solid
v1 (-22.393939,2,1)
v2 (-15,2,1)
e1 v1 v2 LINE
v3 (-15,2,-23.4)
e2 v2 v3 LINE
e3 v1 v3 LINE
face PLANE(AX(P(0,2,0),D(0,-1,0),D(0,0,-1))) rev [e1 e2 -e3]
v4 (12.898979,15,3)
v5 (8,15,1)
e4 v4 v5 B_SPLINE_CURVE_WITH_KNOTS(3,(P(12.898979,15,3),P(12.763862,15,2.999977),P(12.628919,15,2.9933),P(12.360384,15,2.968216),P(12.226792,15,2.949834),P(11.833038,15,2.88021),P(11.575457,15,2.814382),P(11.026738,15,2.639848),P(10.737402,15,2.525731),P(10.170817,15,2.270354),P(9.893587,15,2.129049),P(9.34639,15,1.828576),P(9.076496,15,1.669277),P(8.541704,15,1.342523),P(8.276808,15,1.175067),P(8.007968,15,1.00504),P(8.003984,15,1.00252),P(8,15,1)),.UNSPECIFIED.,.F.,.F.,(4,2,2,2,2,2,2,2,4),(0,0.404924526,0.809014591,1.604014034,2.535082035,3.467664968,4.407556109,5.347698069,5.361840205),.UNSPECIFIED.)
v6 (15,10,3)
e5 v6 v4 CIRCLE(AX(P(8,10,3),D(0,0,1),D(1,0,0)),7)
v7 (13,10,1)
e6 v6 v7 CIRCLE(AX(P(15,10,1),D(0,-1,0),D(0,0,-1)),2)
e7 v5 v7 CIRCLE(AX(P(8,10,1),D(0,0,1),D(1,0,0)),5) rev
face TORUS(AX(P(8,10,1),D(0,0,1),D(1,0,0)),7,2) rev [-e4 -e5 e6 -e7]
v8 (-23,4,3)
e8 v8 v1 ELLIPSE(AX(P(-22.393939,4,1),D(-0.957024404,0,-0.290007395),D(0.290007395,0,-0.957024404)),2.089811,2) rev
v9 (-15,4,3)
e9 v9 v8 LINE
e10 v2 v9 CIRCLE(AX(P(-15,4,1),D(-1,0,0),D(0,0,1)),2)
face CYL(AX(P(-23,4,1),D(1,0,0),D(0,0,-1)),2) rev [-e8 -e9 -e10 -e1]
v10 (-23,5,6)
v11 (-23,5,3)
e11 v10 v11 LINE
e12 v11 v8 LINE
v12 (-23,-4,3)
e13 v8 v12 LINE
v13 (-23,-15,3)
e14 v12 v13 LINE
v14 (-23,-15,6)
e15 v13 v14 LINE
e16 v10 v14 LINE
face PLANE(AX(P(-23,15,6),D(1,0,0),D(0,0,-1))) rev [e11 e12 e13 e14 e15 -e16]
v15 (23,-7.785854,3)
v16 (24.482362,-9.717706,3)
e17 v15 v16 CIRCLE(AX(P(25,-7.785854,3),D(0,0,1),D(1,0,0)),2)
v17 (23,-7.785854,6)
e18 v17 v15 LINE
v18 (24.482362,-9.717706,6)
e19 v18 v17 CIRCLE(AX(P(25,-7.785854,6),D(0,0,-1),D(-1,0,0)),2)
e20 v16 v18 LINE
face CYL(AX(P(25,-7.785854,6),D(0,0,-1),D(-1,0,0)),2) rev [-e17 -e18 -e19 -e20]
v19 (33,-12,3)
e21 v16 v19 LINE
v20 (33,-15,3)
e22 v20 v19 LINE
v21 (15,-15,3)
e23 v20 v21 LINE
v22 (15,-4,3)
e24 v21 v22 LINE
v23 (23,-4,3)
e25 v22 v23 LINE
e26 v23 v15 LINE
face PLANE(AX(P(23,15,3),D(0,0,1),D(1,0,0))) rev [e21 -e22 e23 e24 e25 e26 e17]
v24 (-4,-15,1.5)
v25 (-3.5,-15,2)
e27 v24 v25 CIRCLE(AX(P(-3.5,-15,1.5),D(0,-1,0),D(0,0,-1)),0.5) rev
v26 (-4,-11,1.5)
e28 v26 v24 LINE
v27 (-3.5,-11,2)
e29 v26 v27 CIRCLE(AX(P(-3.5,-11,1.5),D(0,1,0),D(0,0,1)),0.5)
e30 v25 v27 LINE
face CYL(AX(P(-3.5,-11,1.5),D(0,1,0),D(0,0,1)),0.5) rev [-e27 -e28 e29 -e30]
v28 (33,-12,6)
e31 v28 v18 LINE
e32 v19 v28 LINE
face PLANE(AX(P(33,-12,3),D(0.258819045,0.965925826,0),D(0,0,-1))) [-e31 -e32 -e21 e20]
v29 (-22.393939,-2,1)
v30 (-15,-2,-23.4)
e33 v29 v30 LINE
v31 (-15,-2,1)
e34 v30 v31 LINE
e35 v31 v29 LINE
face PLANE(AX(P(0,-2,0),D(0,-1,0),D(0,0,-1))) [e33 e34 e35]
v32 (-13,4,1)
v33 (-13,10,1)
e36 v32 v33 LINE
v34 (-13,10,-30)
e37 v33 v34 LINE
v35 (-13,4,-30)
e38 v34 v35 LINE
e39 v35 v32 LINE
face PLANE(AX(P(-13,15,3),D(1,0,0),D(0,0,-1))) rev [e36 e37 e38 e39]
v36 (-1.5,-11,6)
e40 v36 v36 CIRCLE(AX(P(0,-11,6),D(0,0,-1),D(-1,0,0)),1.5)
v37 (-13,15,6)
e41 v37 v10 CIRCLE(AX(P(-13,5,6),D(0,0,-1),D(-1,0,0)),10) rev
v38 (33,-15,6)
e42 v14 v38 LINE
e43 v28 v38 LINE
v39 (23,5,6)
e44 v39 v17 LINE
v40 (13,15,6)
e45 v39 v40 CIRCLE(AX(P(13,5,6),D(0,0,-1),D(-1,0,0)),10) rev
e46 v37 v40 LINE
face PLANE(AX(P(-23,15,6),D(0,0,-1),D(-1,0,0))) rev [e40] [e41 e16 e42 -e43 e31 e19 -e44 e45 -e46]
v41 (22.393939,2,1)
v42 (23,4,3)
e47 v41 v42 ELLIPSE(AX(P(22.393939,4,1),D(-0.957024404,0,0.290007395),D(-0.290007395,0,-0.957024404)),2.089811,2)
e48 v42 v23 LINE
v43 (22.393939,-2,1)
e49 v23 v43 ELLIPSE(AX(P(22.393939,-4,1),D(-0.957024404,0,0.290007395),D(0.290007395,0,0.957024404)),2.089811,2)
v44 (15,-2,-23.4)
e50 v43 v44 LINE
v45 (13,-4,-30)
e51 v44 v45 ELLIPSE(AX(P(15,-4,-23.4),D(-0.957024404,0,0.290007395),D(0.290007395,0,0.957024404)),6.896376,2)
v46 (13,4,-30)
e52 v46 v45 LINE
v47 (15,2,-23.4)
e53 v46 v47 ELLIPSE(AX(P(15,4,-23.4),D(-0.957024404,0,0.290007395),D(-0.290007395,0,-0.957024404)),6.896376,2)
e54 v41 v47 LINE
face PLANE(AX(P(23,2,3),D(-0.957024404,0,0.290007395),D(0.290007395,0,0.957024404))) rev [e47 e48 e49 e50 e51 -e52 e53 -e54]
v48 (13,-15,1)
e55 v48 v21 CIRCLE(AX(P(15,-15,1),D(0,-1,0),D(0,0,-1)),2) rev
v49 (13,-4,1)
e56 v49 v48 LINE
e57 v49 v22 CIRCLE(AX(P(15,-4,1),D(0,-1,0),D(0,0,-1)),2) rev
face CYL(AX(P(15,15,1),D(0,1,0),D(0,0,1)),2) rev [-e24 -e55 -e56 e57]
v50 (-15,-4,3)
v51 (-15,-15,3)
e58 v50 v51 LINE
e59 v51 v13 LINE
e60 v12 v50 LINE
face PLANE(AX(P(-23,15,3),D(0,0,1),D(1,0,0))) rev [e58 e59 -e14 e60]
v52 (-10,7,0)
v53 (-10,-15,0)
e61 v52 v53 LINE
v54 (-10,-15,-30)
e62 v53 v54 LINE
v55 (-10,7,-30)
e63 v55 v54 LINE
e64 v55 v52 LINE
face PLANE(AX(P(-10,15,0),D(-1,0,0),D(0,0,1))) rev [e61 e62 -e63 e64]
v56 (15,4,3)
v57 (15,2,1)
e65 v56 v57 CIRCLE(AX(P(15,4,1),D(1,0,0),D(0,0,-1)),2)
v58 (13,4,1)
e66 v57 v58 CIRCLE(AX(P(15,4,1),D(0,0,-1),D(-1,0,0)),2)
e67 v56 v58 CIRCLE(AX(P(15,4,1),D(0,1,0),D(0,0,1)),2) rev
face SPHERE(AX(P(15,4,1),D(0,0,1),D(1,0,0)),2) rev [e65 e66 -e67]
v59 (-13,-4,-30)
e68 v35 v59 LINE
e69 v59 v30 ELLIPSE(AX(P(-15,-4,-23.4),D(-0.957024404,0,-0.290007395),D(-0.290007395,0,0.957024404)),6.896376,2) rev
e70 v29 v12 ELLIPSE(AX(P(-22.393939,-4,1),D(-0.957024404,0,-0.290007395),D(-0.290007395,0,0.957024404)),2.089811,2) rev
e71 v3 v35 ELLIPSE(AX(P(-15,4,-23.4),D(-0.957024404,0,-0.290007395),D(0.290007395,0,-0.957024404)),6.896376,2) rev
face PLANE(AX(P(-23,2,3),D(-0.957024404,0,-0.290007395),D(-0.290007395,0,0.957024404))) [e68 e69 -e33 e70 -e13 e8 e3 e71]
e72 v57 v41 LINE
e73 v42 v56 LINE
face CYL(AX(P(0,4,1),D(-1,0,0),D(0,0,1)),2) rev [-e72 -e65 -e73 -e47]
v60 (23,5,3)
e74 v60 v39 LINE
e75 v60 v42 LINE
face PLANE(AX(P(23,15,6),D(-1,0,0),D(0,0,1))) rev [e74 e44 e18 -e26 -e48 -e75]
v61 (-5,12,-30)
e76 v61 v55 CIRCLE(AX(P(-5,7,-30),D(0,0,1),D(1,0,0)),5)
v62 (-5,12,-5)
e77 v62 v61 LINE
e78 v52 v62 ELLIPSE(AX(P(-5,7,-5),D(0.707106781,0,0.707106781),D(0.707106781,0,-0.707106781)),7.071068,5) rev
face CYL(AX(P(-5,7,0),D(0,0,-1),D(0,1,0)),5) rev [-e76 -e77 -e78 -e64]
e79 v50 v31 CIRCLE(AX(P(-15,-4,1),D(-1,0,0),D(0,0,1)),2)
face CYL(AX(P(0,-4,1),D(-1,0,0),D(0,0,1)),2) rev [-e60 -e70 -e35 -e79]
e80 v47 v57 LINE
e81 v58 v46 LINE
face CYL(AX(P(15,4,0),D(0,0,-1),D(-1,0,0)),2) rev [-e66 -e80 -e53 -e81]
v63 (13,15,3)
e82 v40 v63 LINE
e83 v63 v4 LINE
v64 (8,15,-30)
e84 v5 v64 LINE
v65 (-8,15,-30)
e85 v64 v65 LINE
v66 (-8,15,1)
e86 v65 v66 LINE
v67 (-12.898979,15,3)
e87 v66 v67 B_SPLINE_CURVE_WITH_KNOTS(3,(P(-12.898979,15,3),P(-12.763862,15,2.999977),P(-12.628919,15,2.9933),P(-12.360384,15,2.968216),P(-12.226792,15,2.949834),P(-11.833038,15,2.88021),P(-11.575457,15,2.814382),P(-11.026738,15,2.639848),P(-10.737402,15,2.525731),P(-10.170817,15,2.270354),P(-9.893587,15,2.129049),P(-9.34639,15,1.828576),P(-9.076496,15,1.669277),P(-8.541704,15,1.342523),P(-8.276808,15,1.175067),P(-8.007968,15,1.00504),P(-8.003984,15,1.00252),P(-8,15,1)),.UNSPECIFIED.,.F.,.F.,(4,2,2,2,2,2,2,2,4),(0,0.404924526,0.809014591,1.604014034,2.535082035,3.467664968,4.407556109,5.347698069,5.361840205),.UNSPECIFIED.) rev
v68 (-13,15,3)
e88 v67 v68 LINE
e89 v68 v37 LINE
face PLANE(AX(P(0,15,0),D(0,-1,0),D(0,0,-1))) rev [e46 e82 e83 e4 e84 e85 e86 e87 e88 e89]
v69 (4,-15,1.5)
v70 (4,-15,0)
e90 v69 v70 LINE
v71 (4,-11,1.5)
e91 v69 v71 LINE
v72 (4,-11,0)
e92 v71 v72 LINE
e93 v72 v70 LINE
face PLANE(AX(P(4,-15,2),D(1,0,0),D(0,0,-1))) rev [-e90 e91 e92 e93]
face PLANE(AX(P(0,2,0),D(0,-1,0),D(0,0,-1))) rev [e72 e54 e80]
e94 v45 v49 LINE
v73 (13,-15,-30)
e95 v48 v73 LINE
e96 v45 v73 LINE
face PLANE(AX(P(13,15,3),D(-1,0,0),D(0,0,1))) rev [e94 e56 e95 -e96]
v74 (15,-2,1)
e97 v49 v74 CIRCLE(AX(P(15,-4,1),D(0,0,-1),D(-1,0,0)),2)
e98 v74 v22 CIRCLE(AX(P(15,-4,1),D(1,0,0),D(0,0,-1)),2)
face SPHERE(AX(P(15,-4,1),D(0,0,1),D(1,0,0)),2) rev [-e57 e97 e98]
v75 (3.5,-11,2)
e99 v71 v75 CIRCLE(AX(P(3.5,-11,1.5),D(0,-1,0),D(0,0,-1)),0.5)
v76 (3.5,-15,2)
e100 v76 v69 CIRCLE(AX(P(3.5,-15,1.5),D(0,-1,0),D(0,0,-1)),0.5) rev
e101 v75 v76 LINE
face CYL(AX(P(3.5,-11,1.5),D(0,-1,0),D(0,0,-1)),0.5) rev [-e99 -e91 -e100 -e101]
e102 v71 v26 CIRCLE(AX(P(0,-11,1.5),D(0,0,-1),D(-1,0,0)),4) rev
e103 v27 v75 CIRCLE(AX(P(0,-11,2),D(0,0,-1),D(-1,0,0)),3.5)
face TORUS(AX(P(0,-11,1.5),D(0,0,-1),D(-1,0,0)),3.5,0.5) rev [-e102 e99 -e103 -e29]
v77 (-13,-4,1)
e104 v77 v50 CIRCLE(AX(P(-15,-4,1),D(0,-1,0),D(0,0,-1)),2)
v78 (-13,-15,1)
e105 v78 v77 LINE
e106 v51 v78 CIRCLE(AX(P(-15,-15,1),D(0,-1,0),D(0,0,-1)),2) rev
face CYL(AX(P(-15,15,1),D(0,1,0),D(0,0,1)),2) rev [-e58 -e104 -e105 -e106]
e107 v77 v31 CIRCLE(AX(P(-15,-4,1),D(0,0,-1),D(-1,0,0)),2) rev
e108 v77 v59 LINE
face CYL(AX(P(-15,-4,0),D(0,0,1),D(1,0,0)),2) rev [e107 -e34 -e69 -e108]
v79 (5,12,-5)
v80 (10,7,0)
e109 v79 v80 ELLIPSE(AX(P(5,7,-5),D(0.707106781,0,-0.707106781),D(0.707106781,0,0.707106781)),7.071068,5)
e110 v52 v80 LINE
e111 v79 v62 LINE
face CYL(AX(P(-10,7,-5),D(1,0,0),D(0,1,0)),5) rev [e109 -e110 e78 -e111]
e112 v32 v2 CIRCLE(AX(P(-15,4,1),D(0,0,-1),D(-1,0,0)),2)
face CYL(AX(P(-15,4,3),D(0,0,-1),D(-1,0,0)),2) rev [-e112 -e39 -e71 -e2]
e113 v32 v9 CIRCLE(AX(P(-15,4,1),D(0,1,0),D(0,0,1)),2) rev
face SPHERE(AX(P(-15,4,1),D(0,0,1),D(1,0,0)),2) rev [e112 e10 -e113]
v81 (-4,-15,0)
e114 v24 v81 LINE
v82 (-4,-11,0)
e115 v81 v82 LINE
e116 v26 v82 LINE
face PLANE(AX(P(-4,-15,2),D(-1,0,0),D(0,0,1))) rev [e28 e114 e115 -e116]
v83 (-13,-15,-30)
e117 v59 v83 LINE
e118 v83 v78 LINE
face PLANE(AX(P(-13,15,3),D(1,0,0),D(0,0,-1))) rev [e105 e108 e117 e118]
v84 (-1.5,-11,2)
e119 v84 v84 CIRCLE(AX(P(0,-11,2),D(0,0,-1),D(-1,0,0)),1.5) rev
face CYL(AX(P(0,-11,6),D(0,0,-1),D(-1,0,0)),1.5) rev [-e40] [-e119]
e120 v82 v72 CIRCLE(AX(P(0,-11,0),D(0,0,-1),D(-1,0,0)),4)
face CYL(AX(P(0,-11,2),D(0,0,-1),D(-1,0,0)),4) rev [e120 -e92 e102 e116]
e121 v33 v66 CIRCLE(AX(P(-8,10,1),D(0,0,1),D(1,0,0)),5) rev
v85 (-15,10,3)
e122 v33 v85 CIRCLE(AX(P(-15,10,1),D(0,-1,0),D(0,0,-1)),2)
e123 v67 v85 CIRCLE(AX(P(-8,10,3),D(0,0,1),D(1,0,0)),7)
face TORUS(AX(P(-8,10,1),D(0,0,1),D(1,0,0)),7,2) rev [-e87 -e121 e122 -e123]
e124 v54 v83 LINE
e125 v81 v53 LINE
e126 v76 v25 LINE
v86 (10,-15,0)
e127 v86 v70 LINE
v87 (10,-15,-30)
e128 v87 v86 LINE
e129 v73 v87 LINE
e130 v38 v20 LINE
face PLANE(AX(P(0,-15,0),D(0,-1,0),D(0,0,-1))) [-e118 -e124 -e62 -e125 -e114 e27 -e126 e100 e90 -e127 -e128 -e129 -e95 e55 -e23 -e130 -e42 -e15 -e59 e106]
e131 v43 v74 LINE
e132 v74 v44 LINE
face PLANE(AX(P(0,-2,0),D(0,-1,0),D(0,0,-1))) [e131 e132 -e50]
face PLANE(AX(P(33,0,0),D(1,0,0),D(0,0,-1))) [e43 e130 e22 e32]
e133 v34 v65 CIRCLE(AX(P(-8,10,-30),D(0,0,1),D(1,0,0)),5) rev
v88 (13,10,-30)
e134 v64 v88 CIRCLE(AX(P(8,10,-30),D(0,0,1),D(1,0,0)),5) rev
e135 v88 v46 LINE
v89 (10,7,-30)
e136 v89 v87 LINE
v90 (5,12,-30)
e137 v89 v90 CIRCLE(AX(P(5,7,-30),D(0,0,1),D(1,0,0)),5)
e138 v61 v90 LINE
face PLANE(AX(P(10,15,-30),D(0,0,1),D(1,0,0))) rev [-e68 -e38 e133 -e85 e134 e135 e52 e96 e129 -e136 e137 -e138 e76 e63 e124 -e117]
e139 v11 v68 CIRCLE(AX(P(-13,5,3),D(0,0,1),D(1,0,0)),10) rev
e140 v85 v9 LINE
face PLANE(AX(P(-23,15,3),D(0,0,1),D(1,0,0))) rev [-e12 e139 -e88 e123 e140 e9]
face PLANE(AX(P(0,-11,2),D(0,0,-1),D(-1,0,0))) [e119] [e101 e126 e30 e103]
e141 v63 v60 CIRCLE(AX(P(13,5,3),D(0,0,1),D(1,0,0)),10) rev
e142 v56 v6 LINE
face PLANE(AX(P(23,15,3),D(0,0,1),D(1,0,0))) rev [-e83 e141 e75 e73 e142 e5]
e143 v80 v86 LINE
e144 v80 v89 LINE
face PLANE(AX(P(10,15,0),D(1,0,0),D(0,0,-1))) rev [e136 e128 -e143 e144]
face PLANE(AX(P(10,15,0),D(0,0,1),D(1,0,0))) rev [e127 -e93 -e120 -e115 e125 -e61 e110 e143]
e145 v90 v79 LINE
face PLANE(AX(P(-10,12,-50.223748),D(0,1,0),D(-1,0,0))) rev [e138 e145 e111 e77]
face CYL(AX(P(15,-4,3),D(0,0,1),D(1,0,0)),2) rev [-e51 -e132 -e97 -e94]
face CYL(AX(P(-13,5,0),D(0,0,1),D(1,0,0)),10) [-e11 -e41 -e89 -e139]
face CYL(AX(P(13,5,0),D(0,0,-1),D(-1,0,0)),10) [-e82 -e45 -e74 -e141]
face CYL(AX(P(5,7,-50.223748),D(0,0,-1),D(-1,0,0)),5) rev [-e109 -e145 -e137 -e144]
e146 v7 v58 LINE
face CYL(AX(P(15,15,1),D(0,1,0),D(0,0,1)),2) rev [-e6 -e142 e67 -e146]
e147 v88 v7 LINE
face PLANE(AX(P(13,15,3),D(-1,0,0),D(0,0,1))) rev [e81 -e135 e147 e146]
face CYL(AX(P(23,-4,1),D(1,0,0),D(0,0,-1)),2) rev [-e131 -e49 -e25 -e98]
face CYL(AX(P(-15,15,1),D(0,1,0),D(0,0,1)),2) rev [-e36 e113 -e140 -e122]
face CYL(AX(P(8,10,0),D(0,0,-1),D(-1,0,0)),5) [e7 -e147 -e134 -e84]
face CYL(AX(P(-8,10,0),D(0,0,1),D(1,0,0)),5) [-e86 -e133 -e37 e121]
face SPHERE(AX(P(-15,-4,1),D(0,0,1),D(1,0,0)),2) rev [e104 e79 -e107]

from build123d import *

# Parameters (mm, degrees)
BOSS_EXTRUDE1_DEPTH = 15
BOSS_EXTRUDE2_DEPTH = 2
SKETCH3_R           = 1.5
CUT_EXTRUDE1_DEPTH  = 41.669398815
FILLET1_R           = 10
CUT_EXTRUDE4_DEPTH  = 2
FILLET2_R           = 0.5
SKETCH5_W           = 20
SKETCH5_H           = 3
BOSS_EXTRUDE3_DEPTH = 30
SKETCH6_W           = 3
SKETCH6_H           = 3
BOSS_EXTRUDE4_DEPTH = 10
CHAMFER1_SIZE2      = 10
CHAMFER1_SIZE       = 2.679491924
FILLET3_R           = 5
FILLET4_R           = 2


# Some blends are built 0.0001 mm under size
with BuildPart() as part:
    # Sketch1 → Boss-Extrude1 (new, symmetric)
    with BuildSketch(Plane(origin=(0, 0, 0), x_dir=(1, 0, 0), z_dir=(0, 1, 0))):
        Polygon((10, 0), (-10, 0), (-10, 30), (-13, 30), (-13, -3), (-23, -3), (-23, -6), (23, -6), (23, -3), (13, -3), (13, 30), (10, 30), align=None)
    extrude(amount=BOSS_EXTRUDE1_DEPTH, both=True)

    # Sketch2 → Boss-Extrude2 (add, symmetric)
    with BuildSketch(Plane(origin=(0, 0, 0), x_dir=(1, 0, 0), z_dir=(0, 1, 0))):
        Polygon((13, 30), (13, -3), (23, -3), align=None)
    boss_extrude2 = extrude(amount=BOSS_EXTRUDE2_DEPTH, both=True)

    # Mirror1: Boss-Extrude2 across plane
    add(boss_extrude2.mirror(Plane(origin=(0, 0, 0), x_dir=(0, 0, 1), z_dir=(1, 0, 0))))

    # Sketch3 → Cut-Extrude1 (cut, through all)
    with BuildSketch(Plane(origin=(0, 0, 0), x_dir=(-1, 0, 0), z_dir=(0, 0, -1))):
        with Locations((0, -11)):
            Circle(SKETCH3_R)
    extrude(amount=-CUT_EXTRUDE1_DEPTH, mode=Mode.SUBTRACT)

    # Fillet1
    fillet1_edges = [part.edges().sort_by_distance(p)[0] for p in [
        (23, 15, 4.5),
        (-23, 15, 4.5),
    ]]
    fillet(fillet1_edges, radius=FILLET1_R)

    # Sketch4 → Cut-Extrude4 (cut)
    with BuildSketch(Plane(origin=(0, 0, 0), x_dir=(-1, 0, 0), z_dir=(0, 0, -1))):
        with BuildLine():
            Line((0, -15), (4, -15))
            Line((4, -15), (4, -11))
            ThreePointArc((4, -11), (0, -7), (-4, -11))
            Line((-4, -11), (-4, -15))
            Line((-4, -15), (0, -15))
        make_face()
    extrude(amount=-CUT_EXTRUDE4_DEPTH, mode=Mode.SUBTRACT)

    # Fillet2
    fillet2_edges = [part.edges().sort_by_distance(p)[0] for p in [
        (4, -13, 2),
        (0, -7, 2),
        (-4, -13, 2),
    ]]
    fillet(fillet2_edges, radius=FILLET2_R)

    # Sketch5 → Boss-Extrude3 (add)
    with BuildSketch(Plane(origin=(0, 0, 0), x_dir=(-1, 0, 0), z_dir=(0, 0, -1))):
        with Locations((0, 13.5)):
            Rectangle(SKETCH5_W, SKETCH5_H)
    extrude(amount=BOSS_EXTRUDE3_DEPTH)

    # Sketch6 → Boss-Extrude4 (add)
    with BuildSketch(Plane(origin=(23, 0, 0), x_dir=(0, 0, -1), z_dir=(1, 0, 0))):
        with Locations((-4.5, -13.5)):
            Rectangle(SKETCH6_W, SKETCH6_H)
    extrude(amount=BOSS_EXTRUDE4_DEPTH)

    # Chamfer1
    chamfer1_edges = [part.edges().sort_by_distance(p)[0] for p in [
        (23, -12, 4.5),
    ]]
    chamfer1_side = [part.faces().sort_by_distance(p)[0] for p in [
        (23, -11.946410162, 4.5),
    ]]
    chamfer(chamfer1_edges, length=CHAMFER1_SIZE - 0.0001, length2=CHAMFER1_SIZE2 - 0.0001, reference=chamfer1_side[0])  # a hair under: the kernel refuses the full size

    # Fillet3
    fillet3_edges = [part.edges().sort_by_distance(p)[0] for p in [
        (10, 12, -15),
        (0, 12, 0),
        (-10, 12, -15),
        (13, 15, -13.5),
        (-13, 15, -13.5),
    ]]
    fillet(fillet3_edges, radius=FILLET3_R)

    # Fillet4
    # the kernel refuses this fillet: 2 mm, written as the material it adds along each edge
    with BuildSketch(Plane(origin=(-15, 4, 1), x_dir=(0, -1, 0), z_dir=(0, 0, 1))) as fillet4_piece_1_section:
        Polygon((0, 0), (FILLET4_R * 1.02, 0), (FILLET4_R * 1.02, FILLET4_R * 1.02), (0, FILLET4_R * 1.02), align=None)
    fillet4_piece_1 = extrude(amount=FILLET4_R * 1.02, mode=Mode.PRIVATE)
    fillet4_piece_1 = fillet4_piece_1 - Plane(origin=(-15, 4, 1), x_dir=(-0.7071067811865475, 0.7071067811865475, 0), z_dir=(0, 0, 1)) * Sphere(FILLET4_R, mode=Mode.PRIVATE)
    add(fillet4_piece_1)
    with BuildSketch(Plane(origin=(15, 4, 1), x_dir=(-1, 0, 0), z_dir=(0, 0, 1))) as fillet4_piece_2_section:
        Polygon((0, 0), (FILLET4_R * 1.02, 0), (FILLET4_R * 1.02, FILLET4_R * 1.02), (0, FILLET4_R * 1.02), align=None)
    fillet4_piece_2 = extrude(amount=FILLET4_R * 1.02, mode=Mode.PRIVATE)
    fillet4_piece_2 = fillet4_piece_2 - Plane(origin=(15, 4, 1), x_dir=(0.7071067811865475, 0.7071067811865475, 0), z_dir=(0, 0, 1)) * Sphere(FILLET4_R, mode=Mode.PRIVATE)
    add(fillet4_piece_2)
    with BuildSketch(Plane(origin=(15, -4, 1), x_dir=(0, 1, 0), z_dir=(-1, 0, 0))) as fillet4_piece_3_section:
        Polygon((0, 0), (FILLET4_R * 1.02, 0), (FILLET4_R * 1.02, -FILLET4_R * 1.02), (0, -FILLET4_R * 1.02), align=None)
    fillet4_piece_3 = extrude(amount=FILLET4_R * 1.02, mode=Mode.PRIVATE)
    fillet4_piece_3 = fillet4_piece_3 - Plane(origin=(15, -4, 1), x_dir=(0, -0.7071067811865475, -0.7071067811865475), z_dir=(-1, 0, 0)) * Sphere(FILLET4_R, mode=Mode.PRIVATE)
    add(fillet4_piece_3)
    with BuildSketch(Plane(origin=(-15, -4, 1), x_dir=(1, 0, 0), z_dir=(0, 0, 1))) as fillet4_piece_4_section:
        Polygon((0, 0), (FILLET4_R * 1.02, 0), (FILLET4_R * 1.02, FILLET4_R * 1.02), (0, FILLET4_R * 1.02), align=None)
    fillet4_piece_4 = extrude(amount=FILLET4_R * 1.02, mode=Mode.PRIVATE)
    fillet4_piece_4 = fillet4_piece_4 - Plane(origin=(-15, -4, 1), x_dir=(-0.7071067811865475, -0.7071067811865475, 0), z_dir=(0, 0, 1)) * Sphere(FILLET4_R, mode=Mode.PRIVATE)
    add(fillet4_piece_4)
    with BuildSketch(Plane(origin=(23, -9.320608076, 3), x_dir=(0, 1, 0), z_dir=(0, 0, 1))) as fillet4_piece_5:
        with BuildLine():
            CenterArc((FILLET4_R * 0.767332413902, -FILLET4_R), FILLET4_R, 90, 75.000391344)
            Line((-FILLET4_R * 0.19859518016, -FILLET4_R * 0.741187552406), (0, 0))
            Line((0, 0), (FILLET4_R * 0.767332413902, 0))
        make_face()
    extrude(amount=3)
    with BuildSketch(Plane(origin=(-13, 4, 3), x_dir=(-1, 0, 0), z_dir=(0, 1, 0))) as fillet4_piece_6:
        with BuildLine():
            CenterArc((FILLET4_R, -FILLET4_R), FILLET4_R, 90, 90)
            Line((0, -FILLET4_R), (0, 0))
            Line((0, 0), (FILLET4_R, 0))
        make_face()
    extrude(amount=6)
    with BuildSketch(Plane(origin=(13, 4, 3), x_dir=(1, 0, 0), z_dir=(0, 1, 0))) as fillet4_piece_7:
        with BuildLine():
            CenterArc((FILLET4_R, FILLET4_R), FILLET4_R, 180, 90)
            Line((0, FILLET4_R), (0, 0))
            Line((0, 0), (FILLET4_R, 0))
        make_face()
    extrude(amount=6)
    with BuildSketch(Plane(origin=(-8, 10, 3), x_dir=(0.8416879607506225, 0.5399642365263265, 0), z_dir=(0.5399642365263265, -0.8416879607506225, 0))) as fillet4_piece_8_section:
        with BuildLine():
            CenterArc((5 + FILLET4_R, -FILLET4_R), FILLET4_R, 90, 90)
            Line((5 + FILLET4_R, 0), (5, 0))
            Line((5, 0), (5, -FILLET4_R))
        make_face()
    fillet4_piece_8 = revolve(axis=Axis((-8, 10, 3), (0, 0, 1)), revolution_arc=147.318795695, mode=Mode.PRIVATE)
    fillet4_piece_8 = split(fillet4_piece_8, bisect_by=Plane(origin=(-11.613068515, 15, 2.473069622), z_dir=(0, -1, 0)), keep=Keep.TOP, mode=Mode.PRIVATE)
    add(fillet4_piece_8)
    with BuildSketch(Plane(origin=(8, 10, 3), x_dir=(-0.8416879607506222, 0.5399642365263269, 0), z_dir=(-0.5399642365263269, -0.8416879607506222, 0))) as fillet4_piece_9_section:
        with BuildLine():
            CenterArc((5 + FILLET4_R, FILLET4_R), FILLET4_R, 180, 90)
            Line((5, FILLET4_R), (5, 0))
            Line((5, 0), (5 + FILLET4_R, 0))
        make_face()
    fillet4_piece_9 = revolve(axis=Axis((8, 10, 3), (0, 0, -1)), revolution_arc=147.318795695, mode=Mode.PRIVATE)
    fillet4_piece_9 = split(fillet4_piece_9, bisect_by=Plane(origin=(11.613076931, 15, 2.472895292), z_dir=(0, -1, 0)), keep=Keep.TOP, mode=Mode.PRIVATE)
    add(fillet4_piece_9)
    with BuildSketch(Plane(origin=(13, -15, 3), x_dir=(1, 0, 0), z_dir=(0, 1, 0)), Plane(origin=(-13, -15, 3), x_dir=(0, 0, -1), z_dir=(0, 1, 0))) as fillet4_piece_10:
        with BuildLine():
            CenterArc((FILLET4_R, FILLET4_R), FILLET4_R, 180, 90)
            Line((0, FILLET4_R), (0, 0))
            Line((0, 0), (FILLET4_R, 0))
        make_face()
    extrude(amount=11)
    with BuildSketch(Plane(origin=(13, -2, -35), x_dir=(0, -1, 0), z_dir=(0, 0, 1))) as fillet4_piece_11_section:
        with BuildLine():
            CenterArc((FILLET4_R, FILLET4_R), FILLET4_R, 180, 90)
            Line((0, FILLET4_R), (0, 0))
            Line((0, 0), (FILLET4_R, 0))
        make_face()
    fillet4_piece_11 = extrude(amount=36, mode=Mode.PRIVATE)
    fillet4_piece_11 = split(fillet4_piece_11, bisect_by=Plane(origin=(17.53556841, -2.455982706, -15.032624248), z_dir=(-0.9570244044334736, 0, 0.29000739528287095)), keep=Keep.TOP, mode=Mode.PRIVATE)
    add(fillet4_piece_11)
    with BuildSketch(Plane(origin=(15, -2, 3), x_dir=(0, -1, 0), z_dir=(1, 0, 0))) as fillet4_piece_12_section:
        with BuildLine():
            CenterArc((FILLET4_R, FILLET4_R), FILLET4_R, 180, 90)
            Line((0, FILLET4_R), (0, 0))
            Line((0, 0), (FILLET4_R, 0))
        make_face()
    fillet4_piece_12 = extrude(amount=13, mode=Mode.PRIVATE)
    fillet4_piece_12 = split(fillet4_piece_12, bisect_by=Plane(origin=(22.535474122, -2.449923656, 1.467064601), z_dir=(-0.9570244044334736, 0, 0.29000739528287095)), keep=Keep.TOP, mode=Mode.PRIVATE)
    add(fillet4_piece_12)
    with BuildSketch(Plane(origin=(13, 2, -35), x_dir=(0, 1, 0), z_dir=(0, 0, 1))) as fillet4_piece_13_section:
        with BuildLine():
            CenterArc((FILLET4_R, -FILLET4_R), FILLET4_R, 90, 90)
            Line((0, -FILLET4_R), (0, 0))
            Line((0, 0), (FILLET4_R, 0))
        make_face()
    fillet4_piece_13 = extrude(amount=36, mode=Mode.PRIVATE)
    fillet4_piece_13 = split(fillet4_piece_13, bisect_by=Plane(origin=(17.53556841, 2.455982706, -15.032624248), z_dir=(-0.9570244044334736, 0, 0.29000739528287095)), keep=Keep.TOP, mode=Mode.PRIVATE)
    add(fillet4_piece_13)
    with BuildSketch(Plane(origin=(15, 2, 3), x_dir=(0, 1, 0), z_dir=(1, 0, 0))) as fillet4_piece_14_section:
        with BuildLine():
            CenterArc((FILLET4_R, -FILLET4_R), FILLET4_R, 90, 90)
            Line((0, -FILLET4_R), (0, 0))
            Line((0, 0), (FILLET4_R, 0))
        make_face()
    fillet4_piece_14 = extrude(amount=13, mode=Mode.PRIVATE)
    fillet4_piece_14 = split(fillet4_piece_14, bisect_by=Plane(origin=(22.535474122, 2.449923656, 1.467064601), z_dir=(-0.9570244044334736, 0, 0.29000739528287095)), keep=Keep.TOP, mode=Mode.PRIVATE)
    add(fillet4_piece_14)
    with BuildSketch(Plane(origin=(-15, 2, 3), x_dir=(0, 1, 0), z_dir=(-1, 0, 0))) as fillet4_piece_15_section:
        with BuildLine():
            CenterArc((FILLET4_R, FILLET4_R), FILLET4_R, 180, 90)
            Line((0, FILLET4_R), (0, 0))
            Line((0, 0), (FILLET4_R, 0))
        make_face()
    fillet4_piece_15 = extrude(amount=13, mode=Mode.PRIVATE)
    fillet4_piece_15 = split(fillet4_piece_15, bisect_by=Plane(origin=(-22.535474122, 2.449923656, 1.467064601), z_dir=(0.9570244044334736, 0, 0.29000739528287095)), keep=Keep.TOP, mode=Mode.PRIVATE)
    add(fillet4_piece_15)
    with BuildSketch(Plane(origin=(-13, 2, -35), x_dir=(0, 1, 0), z_dir=(0, 0, 1))) as fillet4_piece_16_section:
        with BuildLine():
            CenterArc((FILLET4_R, FILLET4_R), FILLET4_R, 180, 90)
            Line((0, FILLET4_R), (0, 0))
            Line((0, 0), (FILLET4_R, 0))
        make_face()
    fillet4_piece_16 = extrude(amount=36, mode=Mode.PRIVATE)
    fillet4_piece_16 = split(fillet4_piece_16, bisect_by=Plane(origin=(-17.53556841, 2.455982706, -15.032624248), z_dir=(0.9570244044334736, 0, 0.29000739528287095)), keep=Keep.TOP, mode=Mode.PRIVATE)
    add(fillet4_piece_16)
    with BuildSketch(Plane(origin=(-13, -2, -35), x_dir=(0, -1, 0), z_dir=(0, 0, 1))) as fillet4_piece_17_section:
        with BuildLine():
            CenterArc((FILLET4_R, -FILLET4_R), FILLET4_R, 90, 90)
            Line((0, -FILLET4_R), (0, 0))
            Line((0, 0), (FILLET4_R, 0))
        make_face()
    fillet4_piece_17 = extrude(amount=36, mode=Mode.PRIVATE)
    fillet4_piece_17 = split(fillet4_piece_17, bisect_by=Plane(origin=(-17.53556841, -2.455982706, -15.032624248), z_dir=(0.9570244044334736, 0, 0.29000739528287095)), keep=Keep.TOP, mode=Mode.PRIVATE)
    add(fillet4_piece_17)
    with BuildSketch(Plane(origin=(-15, -2, 3), x_dir=(0, -1, 0), z_dir=(-1, 0, 0))) as fillet4_piece_18_section:
        with BuildLine():
            CenterArc((FILLET4_R, -FILLET4_R), FILLET4_R, 90, 90)
            Line((0, -FILLET4_R), (0, 0))
            Line((0, 0), (FILLET4_R, 0))
        make_face()
    fillet4_piece_18 = extrude(amount=13, mode=Mode.PRIVATE)
    fillet4_piece_18 = split(fillet4_piece_18, bisect_by=Plane(origin=(-22.535474122, -2.449923656, 1.467064601), z_dir=(0.9570244044334736, 0, 0.29000739528287095)), keep=Keep.TOP, mode=Mode.PRIVATE)
    add(fillet4_piece_18)


solid = part.part
